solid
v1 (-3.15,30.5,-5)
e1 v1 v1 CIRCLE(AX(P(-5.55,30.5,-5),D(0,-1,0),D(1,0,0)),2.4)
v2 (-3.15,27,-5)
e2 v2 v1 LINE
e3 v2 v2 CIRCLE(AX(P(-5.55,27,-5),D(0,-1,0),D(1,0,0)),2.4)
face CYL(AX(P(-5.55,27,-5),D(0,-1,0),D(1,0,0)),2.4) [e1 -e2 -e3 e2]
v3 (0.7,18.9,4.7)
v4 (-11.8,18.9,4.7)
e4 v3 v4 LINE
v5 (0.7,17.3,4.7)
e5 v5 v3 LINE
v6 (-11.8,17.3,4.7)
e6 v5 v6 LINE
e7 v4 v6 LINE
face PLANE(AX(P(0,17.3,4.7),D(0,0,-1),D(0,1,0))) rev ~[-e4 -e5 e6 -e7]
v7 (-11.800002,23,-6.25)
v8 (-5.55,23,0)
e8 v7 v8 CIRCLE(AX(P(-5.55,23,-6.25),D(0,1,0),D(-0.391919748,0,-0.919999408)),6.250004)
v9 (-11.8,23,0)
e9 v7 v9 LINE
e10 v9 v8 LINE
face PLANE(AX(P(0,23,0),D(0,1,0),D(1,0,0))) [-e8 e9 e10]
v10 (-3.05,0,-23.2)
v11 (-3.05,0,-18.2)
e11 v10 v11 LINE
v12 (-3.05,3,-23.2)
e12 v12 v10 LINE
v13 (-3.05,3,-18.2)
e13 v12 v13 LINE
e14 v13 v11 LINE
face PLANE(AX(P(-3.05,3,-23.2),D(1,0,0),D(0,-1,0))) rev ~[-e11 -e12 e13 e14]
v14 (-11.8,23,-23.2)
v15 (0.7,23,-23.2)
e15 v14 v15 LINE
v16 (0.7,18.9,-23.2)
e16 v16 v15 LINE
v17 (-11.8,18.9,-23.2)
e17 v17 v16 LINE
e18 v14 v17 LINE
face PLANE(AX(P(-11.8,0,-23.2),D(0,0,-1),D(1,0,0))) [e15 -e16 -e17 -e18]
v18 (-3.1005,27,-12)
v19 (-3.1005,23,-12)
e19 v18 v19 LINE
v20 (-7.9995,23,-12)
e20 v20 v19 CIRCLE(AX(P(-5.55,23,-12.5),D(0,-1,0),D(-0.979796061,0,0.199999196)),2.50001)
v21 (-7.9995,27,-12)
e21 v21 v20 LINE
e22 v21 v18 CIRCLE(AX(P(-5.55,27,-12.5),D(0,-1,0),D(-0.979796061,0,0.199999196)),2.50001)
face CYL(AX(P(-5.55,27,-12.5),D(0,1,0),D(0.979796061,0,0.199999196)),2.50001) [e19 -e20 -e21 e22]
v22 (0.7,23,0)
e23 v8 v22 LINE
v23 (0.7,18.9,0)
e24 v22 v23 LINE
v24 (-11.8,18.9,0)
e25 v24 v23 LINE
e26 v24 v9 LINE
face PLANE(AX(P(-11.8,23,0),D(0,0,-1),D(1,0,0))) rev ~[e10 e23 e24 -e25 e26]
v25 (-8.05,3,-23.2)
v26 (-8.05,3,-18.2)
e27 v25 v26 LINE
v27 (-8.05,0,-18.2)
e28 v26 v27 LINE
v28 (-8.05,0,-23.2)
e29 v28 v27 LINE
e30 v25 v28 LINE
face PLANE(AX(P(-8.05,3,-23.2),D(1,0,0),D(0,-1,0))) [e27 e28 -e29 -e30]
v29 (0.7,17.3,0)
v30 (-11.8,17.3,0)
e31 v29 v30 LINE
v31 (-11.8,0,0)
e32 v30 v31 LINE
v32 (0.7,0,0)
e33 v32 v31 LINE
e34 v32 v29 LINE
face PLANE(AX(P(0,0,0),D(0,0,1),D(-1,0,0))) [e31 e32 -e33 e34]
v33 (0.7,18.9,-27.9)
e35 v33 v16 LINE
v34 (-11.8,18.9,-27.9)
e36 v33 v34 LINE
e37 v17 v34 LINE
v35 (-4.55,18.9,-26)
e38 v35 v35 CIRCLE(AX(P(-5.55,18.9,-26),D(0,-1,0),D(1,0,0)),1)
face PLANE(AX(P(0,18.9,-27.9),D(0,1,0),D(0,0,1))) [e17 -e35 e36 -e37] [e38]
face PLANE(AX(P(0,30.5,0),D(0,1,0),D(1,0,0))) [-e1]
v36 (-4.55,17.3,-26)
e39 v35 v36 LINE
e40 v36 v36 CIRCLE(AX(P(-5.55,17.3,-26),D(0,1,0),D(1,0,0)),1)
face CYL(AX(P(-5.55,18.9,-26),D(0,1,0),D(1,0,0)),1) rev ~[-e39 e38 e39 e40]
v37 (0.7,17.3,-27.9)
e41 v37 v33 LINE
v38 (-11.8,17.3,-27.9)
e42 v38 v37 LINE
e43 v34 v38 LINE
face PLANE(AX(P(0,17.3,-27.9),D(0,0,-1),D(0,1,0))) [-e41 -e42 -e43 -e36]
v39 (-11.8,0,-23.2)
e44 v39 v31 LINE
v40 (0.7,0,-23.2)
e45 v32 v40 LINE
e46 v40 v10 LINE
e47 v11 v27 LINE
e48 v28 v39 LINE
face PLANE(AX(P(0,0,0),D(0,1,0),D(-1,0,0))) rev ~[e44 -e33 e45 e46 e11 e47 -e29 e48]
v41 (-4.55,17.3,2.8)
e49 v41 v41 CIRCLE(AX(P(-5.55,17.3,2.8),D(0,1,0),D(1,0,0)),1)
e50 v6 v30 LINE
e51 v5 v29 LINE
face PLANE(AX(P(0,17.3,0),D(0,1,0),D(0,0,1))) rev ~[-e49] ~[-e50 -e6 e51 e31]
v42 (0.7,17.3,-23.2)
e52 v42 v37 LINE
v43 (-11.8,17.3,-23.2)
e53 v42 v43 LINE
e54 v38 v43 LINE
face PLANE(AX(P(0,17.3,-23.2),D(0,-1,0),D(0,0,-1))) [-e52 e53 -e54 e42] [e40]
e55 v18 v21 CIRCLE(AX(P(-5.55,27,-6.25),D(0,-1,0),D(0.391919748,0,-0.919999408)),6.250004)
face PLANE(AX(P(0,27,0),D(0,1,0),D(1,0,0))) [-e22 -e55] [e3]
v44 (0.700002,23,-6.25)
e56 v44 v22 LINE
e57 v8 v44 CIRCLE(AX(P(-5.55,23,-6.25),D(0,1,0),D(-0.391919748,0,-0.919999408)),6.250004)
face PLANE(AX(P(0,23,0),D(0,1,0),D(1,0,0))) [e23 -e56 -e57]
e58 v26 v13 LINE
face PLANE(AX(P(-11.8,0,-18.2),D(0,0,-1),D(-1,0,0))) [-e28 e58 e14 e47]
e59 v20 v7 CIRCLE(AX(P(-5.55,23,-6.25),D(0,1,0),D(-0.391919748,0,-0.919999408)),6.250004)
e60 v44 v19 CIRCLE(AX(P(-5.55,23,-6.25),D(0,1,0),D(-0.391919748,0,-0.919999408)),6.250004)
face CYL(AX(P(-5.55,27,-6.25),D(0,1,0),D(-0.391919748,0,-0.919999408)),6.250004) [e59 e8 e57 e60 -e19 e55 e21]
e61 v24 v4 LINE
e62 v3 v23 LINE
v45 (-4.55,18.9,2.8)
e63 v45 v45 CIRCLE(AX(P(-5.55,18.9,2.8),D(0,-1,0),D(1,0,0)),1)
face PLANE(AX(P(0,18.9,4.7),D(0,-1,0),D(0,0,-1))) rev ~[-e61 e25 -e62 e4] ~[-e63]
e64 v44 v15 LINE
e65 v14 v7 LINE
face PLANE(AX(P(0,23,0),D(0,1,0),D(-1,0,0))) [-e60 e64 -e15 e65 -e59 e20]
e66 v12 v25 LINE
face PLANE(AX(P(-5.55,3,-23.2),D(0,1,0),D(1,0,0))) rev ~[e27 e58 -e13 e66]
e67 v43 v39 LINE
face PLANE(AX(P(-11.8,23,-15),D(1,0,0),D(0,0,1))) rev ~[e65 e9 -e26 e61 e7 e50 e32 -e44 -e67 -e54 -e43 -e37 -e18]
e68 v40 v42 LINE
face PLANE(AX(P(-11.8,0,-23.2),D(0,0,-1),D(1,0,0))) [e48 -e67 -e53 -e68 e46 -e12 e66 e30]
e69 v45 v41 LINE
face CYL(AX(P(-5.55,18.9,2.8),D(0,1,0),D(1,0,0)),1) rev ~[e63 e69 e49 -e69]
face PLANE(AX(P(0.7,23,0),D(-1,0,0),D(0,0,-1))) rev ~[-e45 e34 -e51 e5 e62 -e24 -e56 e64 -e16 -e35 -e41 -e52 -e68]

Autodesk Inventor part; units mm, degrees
ref_plane "YZ Plane" through (0, 0, 0) normal (1, 0, 0) x (0, 1, 0)
ref_plane "XZ Plane" through (0, 0, 0) normal (0, 1, 0) x (-1, 0, 0)
ref_plane "XY Plane" through (0, 0, 0) normal (0, 0, 1) x (1, 0, 0)
sketch "Boceto1" plane through (0, 0, 0) normal (0, 1, 0) x (-1, 0, 0)
  line L0 (0, 0) -> (11.8, 0)
  line L1 (11.8, 0) -> (11.8, -23.2)
  line L2 (11.8, -23.2) -> (0, -23.2)
  line L3 (0, -23.2) -> (0, 0)
  dimension "d0" = 11.8
  dimension "d1" = 23.2
extrude "Extrusión1" add sketch "Boceto1" along normal blind 23
sketch "Boceto2" plane through (0, 0, 0) normal (1, 0, 0) x (0, 0, -1)
  line L0 (0, 0) -> (0, 23) projected
  line L1 (0, 0) -> (0, 17.3)
  line L2 (0, 17.3) -> (-4.7, 17.3)
  line L3 (-4.7, 17.3) -> (-4.7, 18.9)
  line L4 (-4.7, 18.9) -> (0, 18.9)
  line L5 (23.2, 0) -> (23.2, 23) projected
  line L6 (23.2, 17.3) -> (27.9, 17.3)
  line L7 (27.9, 17.3) -> (27.9, 18.9)
  line L8 (27.9, 18.9) -> (23.2, 18.9)
  line L9 (0, 18.9) -> (0, 17.3)
  line L10 (23.2, 18.9) -> (23.2, 17.3)
  line L11 (0, 23) -> (23.2, 23) projected
  dimension "d4" = 17.3
  dimension "d5" = 4.7
  dimension "d6" = 1.6
  dimension "d7" = 4.7
  dimension "d35" = 4.1
  dimension "d36" = 23
extrude "Extrusión2" add sketch "Boceto2" against normal blind 11.8
move faces "Desplazar1" translate (0.7, 0, 0) faces at (0, 11.5333, -15.4667)
sketch "Boceto4" plane through (-11.8, 18.9, 4.7) normal (0, 1, 0) x (1, 0, 0)
  line L0 (12.5, 0) -> (12.5, 4.7) projected
  line L1 (0, 0) -> (12.5, 0)
  line L2 (12.5, 0) -> (0, 0) projected
  line L3 (6.25, 0) -> (6.25, 1.9)
  line L4 (0, 32.6) -> (0, 27.9) projected
  line L5 (12.5, 32.6) -> (0, 32.6) projected
  line L6 (0, 32.6) -> (12.5, 32.6)
  line L7 (6.25, 32.6) -> (6.25, 30.7)
  circle A0 centre (6.25, 1.9) radius 1
  circle A1 centre (6.25, 30.7) radius 1
  point P0 (11.8, 4.7)
  dimension "d13" = 1.9
  dimension "d14" = 1.9
  dimension "d15" = 2
  dimension "d16" = 2
extrude "Extrusión3" cut sketch "Boceto4" against normal blind 2.4
sketch "Boceto5" plane through (0, 23, 0) normal (0, 1, 0) x (1, 0, 0)
  line L0 (-11.8, 23.2) -> (-11.8, 0) projected
  line L1 (-11.8, 0) -> (0.7, 0) projected
  line L2 (-11.8, 0) -> (0.7, 0)
  line L3 (0.7, 0) -> (0.7, 15)
  line L4 (0.7, 0) -> (0.7, 23.2) projected
  line L5 (0.7, 15) -> (-11.8, 15)
  line L6 (-11.8, 15) -> (-11.8, 0)
  point P0 (0, 0)
  dimension "d19" = 15
extrude "Extrusión4" add sketch "Boceto5" along normal blind 4
sketch "Boceto6" plane through (0, 27, 0) normal (0, 1, 0) x (1, 0, 0)
  line L0 (-11.8, 0) -> (0.7, 0) projected
  line L1 (-5.55, 0) -> (-5.55, 5)
  circle A0 centre (-5.55, 5) radius 2.4
  point P0 (0, 0)
  dimension "d22" = 5
  dimension "d23" = 4.8
extrude "Extrusión5" add sketch "Boceto6" along normal blind 3.5
sketch "Boceto7" plane through (0, 27, 0) normal (0, 1, 0) x (1, 0, 0)
  line L0 (-11.8, 0) -> (0.7, 0) projected
  line L1 (-5.55, 0) -> (-5.55, 6.25)
  arc A0 (-7.9995, 12) -> (-3.1005, 12) centre (-5.55, 6.25) ccw
  line L2 (0.7, 15) -> (-11.8, 15) projected
  arc A1 (-3.1005, 12) -> (-7.9995, 12) centre (-5.55, 12.5) ccw
  line L3 (0.7, 0) -> (-11.8, 0)
  line L4 (-11.8, 15) -> (-11.8, 0) projected
  line L5 (-11.8, 0) -> (-11.8, 15)
  line L6 (-11.8, 15) -> (0.7, 15)
  line L7 (0.7, 23.2) -> (0.7, 0) projected
  line L8 (0.7, 0) -> (0.7, 15)
  point P0 (0, 0)
  dimension "d26" = 6.25
extrude "Extrusión6" cut sketch "Boceto7" against normal up to surface (4 mm away) contours L4 A0 L0 | A0 L7 L0 | L4 L2 A1 A0 | A0 A1 L2 L7
sketch "Boceto8" plane through (-11.8, 0, -23.2) normal (0, 0, -1) x (-1, 0, 0)
  line L0 (-12.5, 0) -> (0, 0) projected
  line L1 (-12.5, 0) -> (0, 0)
  line L2 (-6.25, 0) -> (-6.25, 3)
  line L3 (-6.25, 3) -> (-8.75, 3)
  line L4 (-8.75, 3) -> (-8.75, 0)
  line L5 (-6.25, 3) -> (-3.75, 3)
  line L6 (-3.75, 3) -> (-3.75, 0)
  point P0 (-11.8, 0)
  dimension "d30" = 3
  dimension "d31" = 2.5
  dimension "d32" = 2.5
extrude "Extrusión7" cut sketch "Boceto8" against normal blind 5
properties part number "microservo_FT"
